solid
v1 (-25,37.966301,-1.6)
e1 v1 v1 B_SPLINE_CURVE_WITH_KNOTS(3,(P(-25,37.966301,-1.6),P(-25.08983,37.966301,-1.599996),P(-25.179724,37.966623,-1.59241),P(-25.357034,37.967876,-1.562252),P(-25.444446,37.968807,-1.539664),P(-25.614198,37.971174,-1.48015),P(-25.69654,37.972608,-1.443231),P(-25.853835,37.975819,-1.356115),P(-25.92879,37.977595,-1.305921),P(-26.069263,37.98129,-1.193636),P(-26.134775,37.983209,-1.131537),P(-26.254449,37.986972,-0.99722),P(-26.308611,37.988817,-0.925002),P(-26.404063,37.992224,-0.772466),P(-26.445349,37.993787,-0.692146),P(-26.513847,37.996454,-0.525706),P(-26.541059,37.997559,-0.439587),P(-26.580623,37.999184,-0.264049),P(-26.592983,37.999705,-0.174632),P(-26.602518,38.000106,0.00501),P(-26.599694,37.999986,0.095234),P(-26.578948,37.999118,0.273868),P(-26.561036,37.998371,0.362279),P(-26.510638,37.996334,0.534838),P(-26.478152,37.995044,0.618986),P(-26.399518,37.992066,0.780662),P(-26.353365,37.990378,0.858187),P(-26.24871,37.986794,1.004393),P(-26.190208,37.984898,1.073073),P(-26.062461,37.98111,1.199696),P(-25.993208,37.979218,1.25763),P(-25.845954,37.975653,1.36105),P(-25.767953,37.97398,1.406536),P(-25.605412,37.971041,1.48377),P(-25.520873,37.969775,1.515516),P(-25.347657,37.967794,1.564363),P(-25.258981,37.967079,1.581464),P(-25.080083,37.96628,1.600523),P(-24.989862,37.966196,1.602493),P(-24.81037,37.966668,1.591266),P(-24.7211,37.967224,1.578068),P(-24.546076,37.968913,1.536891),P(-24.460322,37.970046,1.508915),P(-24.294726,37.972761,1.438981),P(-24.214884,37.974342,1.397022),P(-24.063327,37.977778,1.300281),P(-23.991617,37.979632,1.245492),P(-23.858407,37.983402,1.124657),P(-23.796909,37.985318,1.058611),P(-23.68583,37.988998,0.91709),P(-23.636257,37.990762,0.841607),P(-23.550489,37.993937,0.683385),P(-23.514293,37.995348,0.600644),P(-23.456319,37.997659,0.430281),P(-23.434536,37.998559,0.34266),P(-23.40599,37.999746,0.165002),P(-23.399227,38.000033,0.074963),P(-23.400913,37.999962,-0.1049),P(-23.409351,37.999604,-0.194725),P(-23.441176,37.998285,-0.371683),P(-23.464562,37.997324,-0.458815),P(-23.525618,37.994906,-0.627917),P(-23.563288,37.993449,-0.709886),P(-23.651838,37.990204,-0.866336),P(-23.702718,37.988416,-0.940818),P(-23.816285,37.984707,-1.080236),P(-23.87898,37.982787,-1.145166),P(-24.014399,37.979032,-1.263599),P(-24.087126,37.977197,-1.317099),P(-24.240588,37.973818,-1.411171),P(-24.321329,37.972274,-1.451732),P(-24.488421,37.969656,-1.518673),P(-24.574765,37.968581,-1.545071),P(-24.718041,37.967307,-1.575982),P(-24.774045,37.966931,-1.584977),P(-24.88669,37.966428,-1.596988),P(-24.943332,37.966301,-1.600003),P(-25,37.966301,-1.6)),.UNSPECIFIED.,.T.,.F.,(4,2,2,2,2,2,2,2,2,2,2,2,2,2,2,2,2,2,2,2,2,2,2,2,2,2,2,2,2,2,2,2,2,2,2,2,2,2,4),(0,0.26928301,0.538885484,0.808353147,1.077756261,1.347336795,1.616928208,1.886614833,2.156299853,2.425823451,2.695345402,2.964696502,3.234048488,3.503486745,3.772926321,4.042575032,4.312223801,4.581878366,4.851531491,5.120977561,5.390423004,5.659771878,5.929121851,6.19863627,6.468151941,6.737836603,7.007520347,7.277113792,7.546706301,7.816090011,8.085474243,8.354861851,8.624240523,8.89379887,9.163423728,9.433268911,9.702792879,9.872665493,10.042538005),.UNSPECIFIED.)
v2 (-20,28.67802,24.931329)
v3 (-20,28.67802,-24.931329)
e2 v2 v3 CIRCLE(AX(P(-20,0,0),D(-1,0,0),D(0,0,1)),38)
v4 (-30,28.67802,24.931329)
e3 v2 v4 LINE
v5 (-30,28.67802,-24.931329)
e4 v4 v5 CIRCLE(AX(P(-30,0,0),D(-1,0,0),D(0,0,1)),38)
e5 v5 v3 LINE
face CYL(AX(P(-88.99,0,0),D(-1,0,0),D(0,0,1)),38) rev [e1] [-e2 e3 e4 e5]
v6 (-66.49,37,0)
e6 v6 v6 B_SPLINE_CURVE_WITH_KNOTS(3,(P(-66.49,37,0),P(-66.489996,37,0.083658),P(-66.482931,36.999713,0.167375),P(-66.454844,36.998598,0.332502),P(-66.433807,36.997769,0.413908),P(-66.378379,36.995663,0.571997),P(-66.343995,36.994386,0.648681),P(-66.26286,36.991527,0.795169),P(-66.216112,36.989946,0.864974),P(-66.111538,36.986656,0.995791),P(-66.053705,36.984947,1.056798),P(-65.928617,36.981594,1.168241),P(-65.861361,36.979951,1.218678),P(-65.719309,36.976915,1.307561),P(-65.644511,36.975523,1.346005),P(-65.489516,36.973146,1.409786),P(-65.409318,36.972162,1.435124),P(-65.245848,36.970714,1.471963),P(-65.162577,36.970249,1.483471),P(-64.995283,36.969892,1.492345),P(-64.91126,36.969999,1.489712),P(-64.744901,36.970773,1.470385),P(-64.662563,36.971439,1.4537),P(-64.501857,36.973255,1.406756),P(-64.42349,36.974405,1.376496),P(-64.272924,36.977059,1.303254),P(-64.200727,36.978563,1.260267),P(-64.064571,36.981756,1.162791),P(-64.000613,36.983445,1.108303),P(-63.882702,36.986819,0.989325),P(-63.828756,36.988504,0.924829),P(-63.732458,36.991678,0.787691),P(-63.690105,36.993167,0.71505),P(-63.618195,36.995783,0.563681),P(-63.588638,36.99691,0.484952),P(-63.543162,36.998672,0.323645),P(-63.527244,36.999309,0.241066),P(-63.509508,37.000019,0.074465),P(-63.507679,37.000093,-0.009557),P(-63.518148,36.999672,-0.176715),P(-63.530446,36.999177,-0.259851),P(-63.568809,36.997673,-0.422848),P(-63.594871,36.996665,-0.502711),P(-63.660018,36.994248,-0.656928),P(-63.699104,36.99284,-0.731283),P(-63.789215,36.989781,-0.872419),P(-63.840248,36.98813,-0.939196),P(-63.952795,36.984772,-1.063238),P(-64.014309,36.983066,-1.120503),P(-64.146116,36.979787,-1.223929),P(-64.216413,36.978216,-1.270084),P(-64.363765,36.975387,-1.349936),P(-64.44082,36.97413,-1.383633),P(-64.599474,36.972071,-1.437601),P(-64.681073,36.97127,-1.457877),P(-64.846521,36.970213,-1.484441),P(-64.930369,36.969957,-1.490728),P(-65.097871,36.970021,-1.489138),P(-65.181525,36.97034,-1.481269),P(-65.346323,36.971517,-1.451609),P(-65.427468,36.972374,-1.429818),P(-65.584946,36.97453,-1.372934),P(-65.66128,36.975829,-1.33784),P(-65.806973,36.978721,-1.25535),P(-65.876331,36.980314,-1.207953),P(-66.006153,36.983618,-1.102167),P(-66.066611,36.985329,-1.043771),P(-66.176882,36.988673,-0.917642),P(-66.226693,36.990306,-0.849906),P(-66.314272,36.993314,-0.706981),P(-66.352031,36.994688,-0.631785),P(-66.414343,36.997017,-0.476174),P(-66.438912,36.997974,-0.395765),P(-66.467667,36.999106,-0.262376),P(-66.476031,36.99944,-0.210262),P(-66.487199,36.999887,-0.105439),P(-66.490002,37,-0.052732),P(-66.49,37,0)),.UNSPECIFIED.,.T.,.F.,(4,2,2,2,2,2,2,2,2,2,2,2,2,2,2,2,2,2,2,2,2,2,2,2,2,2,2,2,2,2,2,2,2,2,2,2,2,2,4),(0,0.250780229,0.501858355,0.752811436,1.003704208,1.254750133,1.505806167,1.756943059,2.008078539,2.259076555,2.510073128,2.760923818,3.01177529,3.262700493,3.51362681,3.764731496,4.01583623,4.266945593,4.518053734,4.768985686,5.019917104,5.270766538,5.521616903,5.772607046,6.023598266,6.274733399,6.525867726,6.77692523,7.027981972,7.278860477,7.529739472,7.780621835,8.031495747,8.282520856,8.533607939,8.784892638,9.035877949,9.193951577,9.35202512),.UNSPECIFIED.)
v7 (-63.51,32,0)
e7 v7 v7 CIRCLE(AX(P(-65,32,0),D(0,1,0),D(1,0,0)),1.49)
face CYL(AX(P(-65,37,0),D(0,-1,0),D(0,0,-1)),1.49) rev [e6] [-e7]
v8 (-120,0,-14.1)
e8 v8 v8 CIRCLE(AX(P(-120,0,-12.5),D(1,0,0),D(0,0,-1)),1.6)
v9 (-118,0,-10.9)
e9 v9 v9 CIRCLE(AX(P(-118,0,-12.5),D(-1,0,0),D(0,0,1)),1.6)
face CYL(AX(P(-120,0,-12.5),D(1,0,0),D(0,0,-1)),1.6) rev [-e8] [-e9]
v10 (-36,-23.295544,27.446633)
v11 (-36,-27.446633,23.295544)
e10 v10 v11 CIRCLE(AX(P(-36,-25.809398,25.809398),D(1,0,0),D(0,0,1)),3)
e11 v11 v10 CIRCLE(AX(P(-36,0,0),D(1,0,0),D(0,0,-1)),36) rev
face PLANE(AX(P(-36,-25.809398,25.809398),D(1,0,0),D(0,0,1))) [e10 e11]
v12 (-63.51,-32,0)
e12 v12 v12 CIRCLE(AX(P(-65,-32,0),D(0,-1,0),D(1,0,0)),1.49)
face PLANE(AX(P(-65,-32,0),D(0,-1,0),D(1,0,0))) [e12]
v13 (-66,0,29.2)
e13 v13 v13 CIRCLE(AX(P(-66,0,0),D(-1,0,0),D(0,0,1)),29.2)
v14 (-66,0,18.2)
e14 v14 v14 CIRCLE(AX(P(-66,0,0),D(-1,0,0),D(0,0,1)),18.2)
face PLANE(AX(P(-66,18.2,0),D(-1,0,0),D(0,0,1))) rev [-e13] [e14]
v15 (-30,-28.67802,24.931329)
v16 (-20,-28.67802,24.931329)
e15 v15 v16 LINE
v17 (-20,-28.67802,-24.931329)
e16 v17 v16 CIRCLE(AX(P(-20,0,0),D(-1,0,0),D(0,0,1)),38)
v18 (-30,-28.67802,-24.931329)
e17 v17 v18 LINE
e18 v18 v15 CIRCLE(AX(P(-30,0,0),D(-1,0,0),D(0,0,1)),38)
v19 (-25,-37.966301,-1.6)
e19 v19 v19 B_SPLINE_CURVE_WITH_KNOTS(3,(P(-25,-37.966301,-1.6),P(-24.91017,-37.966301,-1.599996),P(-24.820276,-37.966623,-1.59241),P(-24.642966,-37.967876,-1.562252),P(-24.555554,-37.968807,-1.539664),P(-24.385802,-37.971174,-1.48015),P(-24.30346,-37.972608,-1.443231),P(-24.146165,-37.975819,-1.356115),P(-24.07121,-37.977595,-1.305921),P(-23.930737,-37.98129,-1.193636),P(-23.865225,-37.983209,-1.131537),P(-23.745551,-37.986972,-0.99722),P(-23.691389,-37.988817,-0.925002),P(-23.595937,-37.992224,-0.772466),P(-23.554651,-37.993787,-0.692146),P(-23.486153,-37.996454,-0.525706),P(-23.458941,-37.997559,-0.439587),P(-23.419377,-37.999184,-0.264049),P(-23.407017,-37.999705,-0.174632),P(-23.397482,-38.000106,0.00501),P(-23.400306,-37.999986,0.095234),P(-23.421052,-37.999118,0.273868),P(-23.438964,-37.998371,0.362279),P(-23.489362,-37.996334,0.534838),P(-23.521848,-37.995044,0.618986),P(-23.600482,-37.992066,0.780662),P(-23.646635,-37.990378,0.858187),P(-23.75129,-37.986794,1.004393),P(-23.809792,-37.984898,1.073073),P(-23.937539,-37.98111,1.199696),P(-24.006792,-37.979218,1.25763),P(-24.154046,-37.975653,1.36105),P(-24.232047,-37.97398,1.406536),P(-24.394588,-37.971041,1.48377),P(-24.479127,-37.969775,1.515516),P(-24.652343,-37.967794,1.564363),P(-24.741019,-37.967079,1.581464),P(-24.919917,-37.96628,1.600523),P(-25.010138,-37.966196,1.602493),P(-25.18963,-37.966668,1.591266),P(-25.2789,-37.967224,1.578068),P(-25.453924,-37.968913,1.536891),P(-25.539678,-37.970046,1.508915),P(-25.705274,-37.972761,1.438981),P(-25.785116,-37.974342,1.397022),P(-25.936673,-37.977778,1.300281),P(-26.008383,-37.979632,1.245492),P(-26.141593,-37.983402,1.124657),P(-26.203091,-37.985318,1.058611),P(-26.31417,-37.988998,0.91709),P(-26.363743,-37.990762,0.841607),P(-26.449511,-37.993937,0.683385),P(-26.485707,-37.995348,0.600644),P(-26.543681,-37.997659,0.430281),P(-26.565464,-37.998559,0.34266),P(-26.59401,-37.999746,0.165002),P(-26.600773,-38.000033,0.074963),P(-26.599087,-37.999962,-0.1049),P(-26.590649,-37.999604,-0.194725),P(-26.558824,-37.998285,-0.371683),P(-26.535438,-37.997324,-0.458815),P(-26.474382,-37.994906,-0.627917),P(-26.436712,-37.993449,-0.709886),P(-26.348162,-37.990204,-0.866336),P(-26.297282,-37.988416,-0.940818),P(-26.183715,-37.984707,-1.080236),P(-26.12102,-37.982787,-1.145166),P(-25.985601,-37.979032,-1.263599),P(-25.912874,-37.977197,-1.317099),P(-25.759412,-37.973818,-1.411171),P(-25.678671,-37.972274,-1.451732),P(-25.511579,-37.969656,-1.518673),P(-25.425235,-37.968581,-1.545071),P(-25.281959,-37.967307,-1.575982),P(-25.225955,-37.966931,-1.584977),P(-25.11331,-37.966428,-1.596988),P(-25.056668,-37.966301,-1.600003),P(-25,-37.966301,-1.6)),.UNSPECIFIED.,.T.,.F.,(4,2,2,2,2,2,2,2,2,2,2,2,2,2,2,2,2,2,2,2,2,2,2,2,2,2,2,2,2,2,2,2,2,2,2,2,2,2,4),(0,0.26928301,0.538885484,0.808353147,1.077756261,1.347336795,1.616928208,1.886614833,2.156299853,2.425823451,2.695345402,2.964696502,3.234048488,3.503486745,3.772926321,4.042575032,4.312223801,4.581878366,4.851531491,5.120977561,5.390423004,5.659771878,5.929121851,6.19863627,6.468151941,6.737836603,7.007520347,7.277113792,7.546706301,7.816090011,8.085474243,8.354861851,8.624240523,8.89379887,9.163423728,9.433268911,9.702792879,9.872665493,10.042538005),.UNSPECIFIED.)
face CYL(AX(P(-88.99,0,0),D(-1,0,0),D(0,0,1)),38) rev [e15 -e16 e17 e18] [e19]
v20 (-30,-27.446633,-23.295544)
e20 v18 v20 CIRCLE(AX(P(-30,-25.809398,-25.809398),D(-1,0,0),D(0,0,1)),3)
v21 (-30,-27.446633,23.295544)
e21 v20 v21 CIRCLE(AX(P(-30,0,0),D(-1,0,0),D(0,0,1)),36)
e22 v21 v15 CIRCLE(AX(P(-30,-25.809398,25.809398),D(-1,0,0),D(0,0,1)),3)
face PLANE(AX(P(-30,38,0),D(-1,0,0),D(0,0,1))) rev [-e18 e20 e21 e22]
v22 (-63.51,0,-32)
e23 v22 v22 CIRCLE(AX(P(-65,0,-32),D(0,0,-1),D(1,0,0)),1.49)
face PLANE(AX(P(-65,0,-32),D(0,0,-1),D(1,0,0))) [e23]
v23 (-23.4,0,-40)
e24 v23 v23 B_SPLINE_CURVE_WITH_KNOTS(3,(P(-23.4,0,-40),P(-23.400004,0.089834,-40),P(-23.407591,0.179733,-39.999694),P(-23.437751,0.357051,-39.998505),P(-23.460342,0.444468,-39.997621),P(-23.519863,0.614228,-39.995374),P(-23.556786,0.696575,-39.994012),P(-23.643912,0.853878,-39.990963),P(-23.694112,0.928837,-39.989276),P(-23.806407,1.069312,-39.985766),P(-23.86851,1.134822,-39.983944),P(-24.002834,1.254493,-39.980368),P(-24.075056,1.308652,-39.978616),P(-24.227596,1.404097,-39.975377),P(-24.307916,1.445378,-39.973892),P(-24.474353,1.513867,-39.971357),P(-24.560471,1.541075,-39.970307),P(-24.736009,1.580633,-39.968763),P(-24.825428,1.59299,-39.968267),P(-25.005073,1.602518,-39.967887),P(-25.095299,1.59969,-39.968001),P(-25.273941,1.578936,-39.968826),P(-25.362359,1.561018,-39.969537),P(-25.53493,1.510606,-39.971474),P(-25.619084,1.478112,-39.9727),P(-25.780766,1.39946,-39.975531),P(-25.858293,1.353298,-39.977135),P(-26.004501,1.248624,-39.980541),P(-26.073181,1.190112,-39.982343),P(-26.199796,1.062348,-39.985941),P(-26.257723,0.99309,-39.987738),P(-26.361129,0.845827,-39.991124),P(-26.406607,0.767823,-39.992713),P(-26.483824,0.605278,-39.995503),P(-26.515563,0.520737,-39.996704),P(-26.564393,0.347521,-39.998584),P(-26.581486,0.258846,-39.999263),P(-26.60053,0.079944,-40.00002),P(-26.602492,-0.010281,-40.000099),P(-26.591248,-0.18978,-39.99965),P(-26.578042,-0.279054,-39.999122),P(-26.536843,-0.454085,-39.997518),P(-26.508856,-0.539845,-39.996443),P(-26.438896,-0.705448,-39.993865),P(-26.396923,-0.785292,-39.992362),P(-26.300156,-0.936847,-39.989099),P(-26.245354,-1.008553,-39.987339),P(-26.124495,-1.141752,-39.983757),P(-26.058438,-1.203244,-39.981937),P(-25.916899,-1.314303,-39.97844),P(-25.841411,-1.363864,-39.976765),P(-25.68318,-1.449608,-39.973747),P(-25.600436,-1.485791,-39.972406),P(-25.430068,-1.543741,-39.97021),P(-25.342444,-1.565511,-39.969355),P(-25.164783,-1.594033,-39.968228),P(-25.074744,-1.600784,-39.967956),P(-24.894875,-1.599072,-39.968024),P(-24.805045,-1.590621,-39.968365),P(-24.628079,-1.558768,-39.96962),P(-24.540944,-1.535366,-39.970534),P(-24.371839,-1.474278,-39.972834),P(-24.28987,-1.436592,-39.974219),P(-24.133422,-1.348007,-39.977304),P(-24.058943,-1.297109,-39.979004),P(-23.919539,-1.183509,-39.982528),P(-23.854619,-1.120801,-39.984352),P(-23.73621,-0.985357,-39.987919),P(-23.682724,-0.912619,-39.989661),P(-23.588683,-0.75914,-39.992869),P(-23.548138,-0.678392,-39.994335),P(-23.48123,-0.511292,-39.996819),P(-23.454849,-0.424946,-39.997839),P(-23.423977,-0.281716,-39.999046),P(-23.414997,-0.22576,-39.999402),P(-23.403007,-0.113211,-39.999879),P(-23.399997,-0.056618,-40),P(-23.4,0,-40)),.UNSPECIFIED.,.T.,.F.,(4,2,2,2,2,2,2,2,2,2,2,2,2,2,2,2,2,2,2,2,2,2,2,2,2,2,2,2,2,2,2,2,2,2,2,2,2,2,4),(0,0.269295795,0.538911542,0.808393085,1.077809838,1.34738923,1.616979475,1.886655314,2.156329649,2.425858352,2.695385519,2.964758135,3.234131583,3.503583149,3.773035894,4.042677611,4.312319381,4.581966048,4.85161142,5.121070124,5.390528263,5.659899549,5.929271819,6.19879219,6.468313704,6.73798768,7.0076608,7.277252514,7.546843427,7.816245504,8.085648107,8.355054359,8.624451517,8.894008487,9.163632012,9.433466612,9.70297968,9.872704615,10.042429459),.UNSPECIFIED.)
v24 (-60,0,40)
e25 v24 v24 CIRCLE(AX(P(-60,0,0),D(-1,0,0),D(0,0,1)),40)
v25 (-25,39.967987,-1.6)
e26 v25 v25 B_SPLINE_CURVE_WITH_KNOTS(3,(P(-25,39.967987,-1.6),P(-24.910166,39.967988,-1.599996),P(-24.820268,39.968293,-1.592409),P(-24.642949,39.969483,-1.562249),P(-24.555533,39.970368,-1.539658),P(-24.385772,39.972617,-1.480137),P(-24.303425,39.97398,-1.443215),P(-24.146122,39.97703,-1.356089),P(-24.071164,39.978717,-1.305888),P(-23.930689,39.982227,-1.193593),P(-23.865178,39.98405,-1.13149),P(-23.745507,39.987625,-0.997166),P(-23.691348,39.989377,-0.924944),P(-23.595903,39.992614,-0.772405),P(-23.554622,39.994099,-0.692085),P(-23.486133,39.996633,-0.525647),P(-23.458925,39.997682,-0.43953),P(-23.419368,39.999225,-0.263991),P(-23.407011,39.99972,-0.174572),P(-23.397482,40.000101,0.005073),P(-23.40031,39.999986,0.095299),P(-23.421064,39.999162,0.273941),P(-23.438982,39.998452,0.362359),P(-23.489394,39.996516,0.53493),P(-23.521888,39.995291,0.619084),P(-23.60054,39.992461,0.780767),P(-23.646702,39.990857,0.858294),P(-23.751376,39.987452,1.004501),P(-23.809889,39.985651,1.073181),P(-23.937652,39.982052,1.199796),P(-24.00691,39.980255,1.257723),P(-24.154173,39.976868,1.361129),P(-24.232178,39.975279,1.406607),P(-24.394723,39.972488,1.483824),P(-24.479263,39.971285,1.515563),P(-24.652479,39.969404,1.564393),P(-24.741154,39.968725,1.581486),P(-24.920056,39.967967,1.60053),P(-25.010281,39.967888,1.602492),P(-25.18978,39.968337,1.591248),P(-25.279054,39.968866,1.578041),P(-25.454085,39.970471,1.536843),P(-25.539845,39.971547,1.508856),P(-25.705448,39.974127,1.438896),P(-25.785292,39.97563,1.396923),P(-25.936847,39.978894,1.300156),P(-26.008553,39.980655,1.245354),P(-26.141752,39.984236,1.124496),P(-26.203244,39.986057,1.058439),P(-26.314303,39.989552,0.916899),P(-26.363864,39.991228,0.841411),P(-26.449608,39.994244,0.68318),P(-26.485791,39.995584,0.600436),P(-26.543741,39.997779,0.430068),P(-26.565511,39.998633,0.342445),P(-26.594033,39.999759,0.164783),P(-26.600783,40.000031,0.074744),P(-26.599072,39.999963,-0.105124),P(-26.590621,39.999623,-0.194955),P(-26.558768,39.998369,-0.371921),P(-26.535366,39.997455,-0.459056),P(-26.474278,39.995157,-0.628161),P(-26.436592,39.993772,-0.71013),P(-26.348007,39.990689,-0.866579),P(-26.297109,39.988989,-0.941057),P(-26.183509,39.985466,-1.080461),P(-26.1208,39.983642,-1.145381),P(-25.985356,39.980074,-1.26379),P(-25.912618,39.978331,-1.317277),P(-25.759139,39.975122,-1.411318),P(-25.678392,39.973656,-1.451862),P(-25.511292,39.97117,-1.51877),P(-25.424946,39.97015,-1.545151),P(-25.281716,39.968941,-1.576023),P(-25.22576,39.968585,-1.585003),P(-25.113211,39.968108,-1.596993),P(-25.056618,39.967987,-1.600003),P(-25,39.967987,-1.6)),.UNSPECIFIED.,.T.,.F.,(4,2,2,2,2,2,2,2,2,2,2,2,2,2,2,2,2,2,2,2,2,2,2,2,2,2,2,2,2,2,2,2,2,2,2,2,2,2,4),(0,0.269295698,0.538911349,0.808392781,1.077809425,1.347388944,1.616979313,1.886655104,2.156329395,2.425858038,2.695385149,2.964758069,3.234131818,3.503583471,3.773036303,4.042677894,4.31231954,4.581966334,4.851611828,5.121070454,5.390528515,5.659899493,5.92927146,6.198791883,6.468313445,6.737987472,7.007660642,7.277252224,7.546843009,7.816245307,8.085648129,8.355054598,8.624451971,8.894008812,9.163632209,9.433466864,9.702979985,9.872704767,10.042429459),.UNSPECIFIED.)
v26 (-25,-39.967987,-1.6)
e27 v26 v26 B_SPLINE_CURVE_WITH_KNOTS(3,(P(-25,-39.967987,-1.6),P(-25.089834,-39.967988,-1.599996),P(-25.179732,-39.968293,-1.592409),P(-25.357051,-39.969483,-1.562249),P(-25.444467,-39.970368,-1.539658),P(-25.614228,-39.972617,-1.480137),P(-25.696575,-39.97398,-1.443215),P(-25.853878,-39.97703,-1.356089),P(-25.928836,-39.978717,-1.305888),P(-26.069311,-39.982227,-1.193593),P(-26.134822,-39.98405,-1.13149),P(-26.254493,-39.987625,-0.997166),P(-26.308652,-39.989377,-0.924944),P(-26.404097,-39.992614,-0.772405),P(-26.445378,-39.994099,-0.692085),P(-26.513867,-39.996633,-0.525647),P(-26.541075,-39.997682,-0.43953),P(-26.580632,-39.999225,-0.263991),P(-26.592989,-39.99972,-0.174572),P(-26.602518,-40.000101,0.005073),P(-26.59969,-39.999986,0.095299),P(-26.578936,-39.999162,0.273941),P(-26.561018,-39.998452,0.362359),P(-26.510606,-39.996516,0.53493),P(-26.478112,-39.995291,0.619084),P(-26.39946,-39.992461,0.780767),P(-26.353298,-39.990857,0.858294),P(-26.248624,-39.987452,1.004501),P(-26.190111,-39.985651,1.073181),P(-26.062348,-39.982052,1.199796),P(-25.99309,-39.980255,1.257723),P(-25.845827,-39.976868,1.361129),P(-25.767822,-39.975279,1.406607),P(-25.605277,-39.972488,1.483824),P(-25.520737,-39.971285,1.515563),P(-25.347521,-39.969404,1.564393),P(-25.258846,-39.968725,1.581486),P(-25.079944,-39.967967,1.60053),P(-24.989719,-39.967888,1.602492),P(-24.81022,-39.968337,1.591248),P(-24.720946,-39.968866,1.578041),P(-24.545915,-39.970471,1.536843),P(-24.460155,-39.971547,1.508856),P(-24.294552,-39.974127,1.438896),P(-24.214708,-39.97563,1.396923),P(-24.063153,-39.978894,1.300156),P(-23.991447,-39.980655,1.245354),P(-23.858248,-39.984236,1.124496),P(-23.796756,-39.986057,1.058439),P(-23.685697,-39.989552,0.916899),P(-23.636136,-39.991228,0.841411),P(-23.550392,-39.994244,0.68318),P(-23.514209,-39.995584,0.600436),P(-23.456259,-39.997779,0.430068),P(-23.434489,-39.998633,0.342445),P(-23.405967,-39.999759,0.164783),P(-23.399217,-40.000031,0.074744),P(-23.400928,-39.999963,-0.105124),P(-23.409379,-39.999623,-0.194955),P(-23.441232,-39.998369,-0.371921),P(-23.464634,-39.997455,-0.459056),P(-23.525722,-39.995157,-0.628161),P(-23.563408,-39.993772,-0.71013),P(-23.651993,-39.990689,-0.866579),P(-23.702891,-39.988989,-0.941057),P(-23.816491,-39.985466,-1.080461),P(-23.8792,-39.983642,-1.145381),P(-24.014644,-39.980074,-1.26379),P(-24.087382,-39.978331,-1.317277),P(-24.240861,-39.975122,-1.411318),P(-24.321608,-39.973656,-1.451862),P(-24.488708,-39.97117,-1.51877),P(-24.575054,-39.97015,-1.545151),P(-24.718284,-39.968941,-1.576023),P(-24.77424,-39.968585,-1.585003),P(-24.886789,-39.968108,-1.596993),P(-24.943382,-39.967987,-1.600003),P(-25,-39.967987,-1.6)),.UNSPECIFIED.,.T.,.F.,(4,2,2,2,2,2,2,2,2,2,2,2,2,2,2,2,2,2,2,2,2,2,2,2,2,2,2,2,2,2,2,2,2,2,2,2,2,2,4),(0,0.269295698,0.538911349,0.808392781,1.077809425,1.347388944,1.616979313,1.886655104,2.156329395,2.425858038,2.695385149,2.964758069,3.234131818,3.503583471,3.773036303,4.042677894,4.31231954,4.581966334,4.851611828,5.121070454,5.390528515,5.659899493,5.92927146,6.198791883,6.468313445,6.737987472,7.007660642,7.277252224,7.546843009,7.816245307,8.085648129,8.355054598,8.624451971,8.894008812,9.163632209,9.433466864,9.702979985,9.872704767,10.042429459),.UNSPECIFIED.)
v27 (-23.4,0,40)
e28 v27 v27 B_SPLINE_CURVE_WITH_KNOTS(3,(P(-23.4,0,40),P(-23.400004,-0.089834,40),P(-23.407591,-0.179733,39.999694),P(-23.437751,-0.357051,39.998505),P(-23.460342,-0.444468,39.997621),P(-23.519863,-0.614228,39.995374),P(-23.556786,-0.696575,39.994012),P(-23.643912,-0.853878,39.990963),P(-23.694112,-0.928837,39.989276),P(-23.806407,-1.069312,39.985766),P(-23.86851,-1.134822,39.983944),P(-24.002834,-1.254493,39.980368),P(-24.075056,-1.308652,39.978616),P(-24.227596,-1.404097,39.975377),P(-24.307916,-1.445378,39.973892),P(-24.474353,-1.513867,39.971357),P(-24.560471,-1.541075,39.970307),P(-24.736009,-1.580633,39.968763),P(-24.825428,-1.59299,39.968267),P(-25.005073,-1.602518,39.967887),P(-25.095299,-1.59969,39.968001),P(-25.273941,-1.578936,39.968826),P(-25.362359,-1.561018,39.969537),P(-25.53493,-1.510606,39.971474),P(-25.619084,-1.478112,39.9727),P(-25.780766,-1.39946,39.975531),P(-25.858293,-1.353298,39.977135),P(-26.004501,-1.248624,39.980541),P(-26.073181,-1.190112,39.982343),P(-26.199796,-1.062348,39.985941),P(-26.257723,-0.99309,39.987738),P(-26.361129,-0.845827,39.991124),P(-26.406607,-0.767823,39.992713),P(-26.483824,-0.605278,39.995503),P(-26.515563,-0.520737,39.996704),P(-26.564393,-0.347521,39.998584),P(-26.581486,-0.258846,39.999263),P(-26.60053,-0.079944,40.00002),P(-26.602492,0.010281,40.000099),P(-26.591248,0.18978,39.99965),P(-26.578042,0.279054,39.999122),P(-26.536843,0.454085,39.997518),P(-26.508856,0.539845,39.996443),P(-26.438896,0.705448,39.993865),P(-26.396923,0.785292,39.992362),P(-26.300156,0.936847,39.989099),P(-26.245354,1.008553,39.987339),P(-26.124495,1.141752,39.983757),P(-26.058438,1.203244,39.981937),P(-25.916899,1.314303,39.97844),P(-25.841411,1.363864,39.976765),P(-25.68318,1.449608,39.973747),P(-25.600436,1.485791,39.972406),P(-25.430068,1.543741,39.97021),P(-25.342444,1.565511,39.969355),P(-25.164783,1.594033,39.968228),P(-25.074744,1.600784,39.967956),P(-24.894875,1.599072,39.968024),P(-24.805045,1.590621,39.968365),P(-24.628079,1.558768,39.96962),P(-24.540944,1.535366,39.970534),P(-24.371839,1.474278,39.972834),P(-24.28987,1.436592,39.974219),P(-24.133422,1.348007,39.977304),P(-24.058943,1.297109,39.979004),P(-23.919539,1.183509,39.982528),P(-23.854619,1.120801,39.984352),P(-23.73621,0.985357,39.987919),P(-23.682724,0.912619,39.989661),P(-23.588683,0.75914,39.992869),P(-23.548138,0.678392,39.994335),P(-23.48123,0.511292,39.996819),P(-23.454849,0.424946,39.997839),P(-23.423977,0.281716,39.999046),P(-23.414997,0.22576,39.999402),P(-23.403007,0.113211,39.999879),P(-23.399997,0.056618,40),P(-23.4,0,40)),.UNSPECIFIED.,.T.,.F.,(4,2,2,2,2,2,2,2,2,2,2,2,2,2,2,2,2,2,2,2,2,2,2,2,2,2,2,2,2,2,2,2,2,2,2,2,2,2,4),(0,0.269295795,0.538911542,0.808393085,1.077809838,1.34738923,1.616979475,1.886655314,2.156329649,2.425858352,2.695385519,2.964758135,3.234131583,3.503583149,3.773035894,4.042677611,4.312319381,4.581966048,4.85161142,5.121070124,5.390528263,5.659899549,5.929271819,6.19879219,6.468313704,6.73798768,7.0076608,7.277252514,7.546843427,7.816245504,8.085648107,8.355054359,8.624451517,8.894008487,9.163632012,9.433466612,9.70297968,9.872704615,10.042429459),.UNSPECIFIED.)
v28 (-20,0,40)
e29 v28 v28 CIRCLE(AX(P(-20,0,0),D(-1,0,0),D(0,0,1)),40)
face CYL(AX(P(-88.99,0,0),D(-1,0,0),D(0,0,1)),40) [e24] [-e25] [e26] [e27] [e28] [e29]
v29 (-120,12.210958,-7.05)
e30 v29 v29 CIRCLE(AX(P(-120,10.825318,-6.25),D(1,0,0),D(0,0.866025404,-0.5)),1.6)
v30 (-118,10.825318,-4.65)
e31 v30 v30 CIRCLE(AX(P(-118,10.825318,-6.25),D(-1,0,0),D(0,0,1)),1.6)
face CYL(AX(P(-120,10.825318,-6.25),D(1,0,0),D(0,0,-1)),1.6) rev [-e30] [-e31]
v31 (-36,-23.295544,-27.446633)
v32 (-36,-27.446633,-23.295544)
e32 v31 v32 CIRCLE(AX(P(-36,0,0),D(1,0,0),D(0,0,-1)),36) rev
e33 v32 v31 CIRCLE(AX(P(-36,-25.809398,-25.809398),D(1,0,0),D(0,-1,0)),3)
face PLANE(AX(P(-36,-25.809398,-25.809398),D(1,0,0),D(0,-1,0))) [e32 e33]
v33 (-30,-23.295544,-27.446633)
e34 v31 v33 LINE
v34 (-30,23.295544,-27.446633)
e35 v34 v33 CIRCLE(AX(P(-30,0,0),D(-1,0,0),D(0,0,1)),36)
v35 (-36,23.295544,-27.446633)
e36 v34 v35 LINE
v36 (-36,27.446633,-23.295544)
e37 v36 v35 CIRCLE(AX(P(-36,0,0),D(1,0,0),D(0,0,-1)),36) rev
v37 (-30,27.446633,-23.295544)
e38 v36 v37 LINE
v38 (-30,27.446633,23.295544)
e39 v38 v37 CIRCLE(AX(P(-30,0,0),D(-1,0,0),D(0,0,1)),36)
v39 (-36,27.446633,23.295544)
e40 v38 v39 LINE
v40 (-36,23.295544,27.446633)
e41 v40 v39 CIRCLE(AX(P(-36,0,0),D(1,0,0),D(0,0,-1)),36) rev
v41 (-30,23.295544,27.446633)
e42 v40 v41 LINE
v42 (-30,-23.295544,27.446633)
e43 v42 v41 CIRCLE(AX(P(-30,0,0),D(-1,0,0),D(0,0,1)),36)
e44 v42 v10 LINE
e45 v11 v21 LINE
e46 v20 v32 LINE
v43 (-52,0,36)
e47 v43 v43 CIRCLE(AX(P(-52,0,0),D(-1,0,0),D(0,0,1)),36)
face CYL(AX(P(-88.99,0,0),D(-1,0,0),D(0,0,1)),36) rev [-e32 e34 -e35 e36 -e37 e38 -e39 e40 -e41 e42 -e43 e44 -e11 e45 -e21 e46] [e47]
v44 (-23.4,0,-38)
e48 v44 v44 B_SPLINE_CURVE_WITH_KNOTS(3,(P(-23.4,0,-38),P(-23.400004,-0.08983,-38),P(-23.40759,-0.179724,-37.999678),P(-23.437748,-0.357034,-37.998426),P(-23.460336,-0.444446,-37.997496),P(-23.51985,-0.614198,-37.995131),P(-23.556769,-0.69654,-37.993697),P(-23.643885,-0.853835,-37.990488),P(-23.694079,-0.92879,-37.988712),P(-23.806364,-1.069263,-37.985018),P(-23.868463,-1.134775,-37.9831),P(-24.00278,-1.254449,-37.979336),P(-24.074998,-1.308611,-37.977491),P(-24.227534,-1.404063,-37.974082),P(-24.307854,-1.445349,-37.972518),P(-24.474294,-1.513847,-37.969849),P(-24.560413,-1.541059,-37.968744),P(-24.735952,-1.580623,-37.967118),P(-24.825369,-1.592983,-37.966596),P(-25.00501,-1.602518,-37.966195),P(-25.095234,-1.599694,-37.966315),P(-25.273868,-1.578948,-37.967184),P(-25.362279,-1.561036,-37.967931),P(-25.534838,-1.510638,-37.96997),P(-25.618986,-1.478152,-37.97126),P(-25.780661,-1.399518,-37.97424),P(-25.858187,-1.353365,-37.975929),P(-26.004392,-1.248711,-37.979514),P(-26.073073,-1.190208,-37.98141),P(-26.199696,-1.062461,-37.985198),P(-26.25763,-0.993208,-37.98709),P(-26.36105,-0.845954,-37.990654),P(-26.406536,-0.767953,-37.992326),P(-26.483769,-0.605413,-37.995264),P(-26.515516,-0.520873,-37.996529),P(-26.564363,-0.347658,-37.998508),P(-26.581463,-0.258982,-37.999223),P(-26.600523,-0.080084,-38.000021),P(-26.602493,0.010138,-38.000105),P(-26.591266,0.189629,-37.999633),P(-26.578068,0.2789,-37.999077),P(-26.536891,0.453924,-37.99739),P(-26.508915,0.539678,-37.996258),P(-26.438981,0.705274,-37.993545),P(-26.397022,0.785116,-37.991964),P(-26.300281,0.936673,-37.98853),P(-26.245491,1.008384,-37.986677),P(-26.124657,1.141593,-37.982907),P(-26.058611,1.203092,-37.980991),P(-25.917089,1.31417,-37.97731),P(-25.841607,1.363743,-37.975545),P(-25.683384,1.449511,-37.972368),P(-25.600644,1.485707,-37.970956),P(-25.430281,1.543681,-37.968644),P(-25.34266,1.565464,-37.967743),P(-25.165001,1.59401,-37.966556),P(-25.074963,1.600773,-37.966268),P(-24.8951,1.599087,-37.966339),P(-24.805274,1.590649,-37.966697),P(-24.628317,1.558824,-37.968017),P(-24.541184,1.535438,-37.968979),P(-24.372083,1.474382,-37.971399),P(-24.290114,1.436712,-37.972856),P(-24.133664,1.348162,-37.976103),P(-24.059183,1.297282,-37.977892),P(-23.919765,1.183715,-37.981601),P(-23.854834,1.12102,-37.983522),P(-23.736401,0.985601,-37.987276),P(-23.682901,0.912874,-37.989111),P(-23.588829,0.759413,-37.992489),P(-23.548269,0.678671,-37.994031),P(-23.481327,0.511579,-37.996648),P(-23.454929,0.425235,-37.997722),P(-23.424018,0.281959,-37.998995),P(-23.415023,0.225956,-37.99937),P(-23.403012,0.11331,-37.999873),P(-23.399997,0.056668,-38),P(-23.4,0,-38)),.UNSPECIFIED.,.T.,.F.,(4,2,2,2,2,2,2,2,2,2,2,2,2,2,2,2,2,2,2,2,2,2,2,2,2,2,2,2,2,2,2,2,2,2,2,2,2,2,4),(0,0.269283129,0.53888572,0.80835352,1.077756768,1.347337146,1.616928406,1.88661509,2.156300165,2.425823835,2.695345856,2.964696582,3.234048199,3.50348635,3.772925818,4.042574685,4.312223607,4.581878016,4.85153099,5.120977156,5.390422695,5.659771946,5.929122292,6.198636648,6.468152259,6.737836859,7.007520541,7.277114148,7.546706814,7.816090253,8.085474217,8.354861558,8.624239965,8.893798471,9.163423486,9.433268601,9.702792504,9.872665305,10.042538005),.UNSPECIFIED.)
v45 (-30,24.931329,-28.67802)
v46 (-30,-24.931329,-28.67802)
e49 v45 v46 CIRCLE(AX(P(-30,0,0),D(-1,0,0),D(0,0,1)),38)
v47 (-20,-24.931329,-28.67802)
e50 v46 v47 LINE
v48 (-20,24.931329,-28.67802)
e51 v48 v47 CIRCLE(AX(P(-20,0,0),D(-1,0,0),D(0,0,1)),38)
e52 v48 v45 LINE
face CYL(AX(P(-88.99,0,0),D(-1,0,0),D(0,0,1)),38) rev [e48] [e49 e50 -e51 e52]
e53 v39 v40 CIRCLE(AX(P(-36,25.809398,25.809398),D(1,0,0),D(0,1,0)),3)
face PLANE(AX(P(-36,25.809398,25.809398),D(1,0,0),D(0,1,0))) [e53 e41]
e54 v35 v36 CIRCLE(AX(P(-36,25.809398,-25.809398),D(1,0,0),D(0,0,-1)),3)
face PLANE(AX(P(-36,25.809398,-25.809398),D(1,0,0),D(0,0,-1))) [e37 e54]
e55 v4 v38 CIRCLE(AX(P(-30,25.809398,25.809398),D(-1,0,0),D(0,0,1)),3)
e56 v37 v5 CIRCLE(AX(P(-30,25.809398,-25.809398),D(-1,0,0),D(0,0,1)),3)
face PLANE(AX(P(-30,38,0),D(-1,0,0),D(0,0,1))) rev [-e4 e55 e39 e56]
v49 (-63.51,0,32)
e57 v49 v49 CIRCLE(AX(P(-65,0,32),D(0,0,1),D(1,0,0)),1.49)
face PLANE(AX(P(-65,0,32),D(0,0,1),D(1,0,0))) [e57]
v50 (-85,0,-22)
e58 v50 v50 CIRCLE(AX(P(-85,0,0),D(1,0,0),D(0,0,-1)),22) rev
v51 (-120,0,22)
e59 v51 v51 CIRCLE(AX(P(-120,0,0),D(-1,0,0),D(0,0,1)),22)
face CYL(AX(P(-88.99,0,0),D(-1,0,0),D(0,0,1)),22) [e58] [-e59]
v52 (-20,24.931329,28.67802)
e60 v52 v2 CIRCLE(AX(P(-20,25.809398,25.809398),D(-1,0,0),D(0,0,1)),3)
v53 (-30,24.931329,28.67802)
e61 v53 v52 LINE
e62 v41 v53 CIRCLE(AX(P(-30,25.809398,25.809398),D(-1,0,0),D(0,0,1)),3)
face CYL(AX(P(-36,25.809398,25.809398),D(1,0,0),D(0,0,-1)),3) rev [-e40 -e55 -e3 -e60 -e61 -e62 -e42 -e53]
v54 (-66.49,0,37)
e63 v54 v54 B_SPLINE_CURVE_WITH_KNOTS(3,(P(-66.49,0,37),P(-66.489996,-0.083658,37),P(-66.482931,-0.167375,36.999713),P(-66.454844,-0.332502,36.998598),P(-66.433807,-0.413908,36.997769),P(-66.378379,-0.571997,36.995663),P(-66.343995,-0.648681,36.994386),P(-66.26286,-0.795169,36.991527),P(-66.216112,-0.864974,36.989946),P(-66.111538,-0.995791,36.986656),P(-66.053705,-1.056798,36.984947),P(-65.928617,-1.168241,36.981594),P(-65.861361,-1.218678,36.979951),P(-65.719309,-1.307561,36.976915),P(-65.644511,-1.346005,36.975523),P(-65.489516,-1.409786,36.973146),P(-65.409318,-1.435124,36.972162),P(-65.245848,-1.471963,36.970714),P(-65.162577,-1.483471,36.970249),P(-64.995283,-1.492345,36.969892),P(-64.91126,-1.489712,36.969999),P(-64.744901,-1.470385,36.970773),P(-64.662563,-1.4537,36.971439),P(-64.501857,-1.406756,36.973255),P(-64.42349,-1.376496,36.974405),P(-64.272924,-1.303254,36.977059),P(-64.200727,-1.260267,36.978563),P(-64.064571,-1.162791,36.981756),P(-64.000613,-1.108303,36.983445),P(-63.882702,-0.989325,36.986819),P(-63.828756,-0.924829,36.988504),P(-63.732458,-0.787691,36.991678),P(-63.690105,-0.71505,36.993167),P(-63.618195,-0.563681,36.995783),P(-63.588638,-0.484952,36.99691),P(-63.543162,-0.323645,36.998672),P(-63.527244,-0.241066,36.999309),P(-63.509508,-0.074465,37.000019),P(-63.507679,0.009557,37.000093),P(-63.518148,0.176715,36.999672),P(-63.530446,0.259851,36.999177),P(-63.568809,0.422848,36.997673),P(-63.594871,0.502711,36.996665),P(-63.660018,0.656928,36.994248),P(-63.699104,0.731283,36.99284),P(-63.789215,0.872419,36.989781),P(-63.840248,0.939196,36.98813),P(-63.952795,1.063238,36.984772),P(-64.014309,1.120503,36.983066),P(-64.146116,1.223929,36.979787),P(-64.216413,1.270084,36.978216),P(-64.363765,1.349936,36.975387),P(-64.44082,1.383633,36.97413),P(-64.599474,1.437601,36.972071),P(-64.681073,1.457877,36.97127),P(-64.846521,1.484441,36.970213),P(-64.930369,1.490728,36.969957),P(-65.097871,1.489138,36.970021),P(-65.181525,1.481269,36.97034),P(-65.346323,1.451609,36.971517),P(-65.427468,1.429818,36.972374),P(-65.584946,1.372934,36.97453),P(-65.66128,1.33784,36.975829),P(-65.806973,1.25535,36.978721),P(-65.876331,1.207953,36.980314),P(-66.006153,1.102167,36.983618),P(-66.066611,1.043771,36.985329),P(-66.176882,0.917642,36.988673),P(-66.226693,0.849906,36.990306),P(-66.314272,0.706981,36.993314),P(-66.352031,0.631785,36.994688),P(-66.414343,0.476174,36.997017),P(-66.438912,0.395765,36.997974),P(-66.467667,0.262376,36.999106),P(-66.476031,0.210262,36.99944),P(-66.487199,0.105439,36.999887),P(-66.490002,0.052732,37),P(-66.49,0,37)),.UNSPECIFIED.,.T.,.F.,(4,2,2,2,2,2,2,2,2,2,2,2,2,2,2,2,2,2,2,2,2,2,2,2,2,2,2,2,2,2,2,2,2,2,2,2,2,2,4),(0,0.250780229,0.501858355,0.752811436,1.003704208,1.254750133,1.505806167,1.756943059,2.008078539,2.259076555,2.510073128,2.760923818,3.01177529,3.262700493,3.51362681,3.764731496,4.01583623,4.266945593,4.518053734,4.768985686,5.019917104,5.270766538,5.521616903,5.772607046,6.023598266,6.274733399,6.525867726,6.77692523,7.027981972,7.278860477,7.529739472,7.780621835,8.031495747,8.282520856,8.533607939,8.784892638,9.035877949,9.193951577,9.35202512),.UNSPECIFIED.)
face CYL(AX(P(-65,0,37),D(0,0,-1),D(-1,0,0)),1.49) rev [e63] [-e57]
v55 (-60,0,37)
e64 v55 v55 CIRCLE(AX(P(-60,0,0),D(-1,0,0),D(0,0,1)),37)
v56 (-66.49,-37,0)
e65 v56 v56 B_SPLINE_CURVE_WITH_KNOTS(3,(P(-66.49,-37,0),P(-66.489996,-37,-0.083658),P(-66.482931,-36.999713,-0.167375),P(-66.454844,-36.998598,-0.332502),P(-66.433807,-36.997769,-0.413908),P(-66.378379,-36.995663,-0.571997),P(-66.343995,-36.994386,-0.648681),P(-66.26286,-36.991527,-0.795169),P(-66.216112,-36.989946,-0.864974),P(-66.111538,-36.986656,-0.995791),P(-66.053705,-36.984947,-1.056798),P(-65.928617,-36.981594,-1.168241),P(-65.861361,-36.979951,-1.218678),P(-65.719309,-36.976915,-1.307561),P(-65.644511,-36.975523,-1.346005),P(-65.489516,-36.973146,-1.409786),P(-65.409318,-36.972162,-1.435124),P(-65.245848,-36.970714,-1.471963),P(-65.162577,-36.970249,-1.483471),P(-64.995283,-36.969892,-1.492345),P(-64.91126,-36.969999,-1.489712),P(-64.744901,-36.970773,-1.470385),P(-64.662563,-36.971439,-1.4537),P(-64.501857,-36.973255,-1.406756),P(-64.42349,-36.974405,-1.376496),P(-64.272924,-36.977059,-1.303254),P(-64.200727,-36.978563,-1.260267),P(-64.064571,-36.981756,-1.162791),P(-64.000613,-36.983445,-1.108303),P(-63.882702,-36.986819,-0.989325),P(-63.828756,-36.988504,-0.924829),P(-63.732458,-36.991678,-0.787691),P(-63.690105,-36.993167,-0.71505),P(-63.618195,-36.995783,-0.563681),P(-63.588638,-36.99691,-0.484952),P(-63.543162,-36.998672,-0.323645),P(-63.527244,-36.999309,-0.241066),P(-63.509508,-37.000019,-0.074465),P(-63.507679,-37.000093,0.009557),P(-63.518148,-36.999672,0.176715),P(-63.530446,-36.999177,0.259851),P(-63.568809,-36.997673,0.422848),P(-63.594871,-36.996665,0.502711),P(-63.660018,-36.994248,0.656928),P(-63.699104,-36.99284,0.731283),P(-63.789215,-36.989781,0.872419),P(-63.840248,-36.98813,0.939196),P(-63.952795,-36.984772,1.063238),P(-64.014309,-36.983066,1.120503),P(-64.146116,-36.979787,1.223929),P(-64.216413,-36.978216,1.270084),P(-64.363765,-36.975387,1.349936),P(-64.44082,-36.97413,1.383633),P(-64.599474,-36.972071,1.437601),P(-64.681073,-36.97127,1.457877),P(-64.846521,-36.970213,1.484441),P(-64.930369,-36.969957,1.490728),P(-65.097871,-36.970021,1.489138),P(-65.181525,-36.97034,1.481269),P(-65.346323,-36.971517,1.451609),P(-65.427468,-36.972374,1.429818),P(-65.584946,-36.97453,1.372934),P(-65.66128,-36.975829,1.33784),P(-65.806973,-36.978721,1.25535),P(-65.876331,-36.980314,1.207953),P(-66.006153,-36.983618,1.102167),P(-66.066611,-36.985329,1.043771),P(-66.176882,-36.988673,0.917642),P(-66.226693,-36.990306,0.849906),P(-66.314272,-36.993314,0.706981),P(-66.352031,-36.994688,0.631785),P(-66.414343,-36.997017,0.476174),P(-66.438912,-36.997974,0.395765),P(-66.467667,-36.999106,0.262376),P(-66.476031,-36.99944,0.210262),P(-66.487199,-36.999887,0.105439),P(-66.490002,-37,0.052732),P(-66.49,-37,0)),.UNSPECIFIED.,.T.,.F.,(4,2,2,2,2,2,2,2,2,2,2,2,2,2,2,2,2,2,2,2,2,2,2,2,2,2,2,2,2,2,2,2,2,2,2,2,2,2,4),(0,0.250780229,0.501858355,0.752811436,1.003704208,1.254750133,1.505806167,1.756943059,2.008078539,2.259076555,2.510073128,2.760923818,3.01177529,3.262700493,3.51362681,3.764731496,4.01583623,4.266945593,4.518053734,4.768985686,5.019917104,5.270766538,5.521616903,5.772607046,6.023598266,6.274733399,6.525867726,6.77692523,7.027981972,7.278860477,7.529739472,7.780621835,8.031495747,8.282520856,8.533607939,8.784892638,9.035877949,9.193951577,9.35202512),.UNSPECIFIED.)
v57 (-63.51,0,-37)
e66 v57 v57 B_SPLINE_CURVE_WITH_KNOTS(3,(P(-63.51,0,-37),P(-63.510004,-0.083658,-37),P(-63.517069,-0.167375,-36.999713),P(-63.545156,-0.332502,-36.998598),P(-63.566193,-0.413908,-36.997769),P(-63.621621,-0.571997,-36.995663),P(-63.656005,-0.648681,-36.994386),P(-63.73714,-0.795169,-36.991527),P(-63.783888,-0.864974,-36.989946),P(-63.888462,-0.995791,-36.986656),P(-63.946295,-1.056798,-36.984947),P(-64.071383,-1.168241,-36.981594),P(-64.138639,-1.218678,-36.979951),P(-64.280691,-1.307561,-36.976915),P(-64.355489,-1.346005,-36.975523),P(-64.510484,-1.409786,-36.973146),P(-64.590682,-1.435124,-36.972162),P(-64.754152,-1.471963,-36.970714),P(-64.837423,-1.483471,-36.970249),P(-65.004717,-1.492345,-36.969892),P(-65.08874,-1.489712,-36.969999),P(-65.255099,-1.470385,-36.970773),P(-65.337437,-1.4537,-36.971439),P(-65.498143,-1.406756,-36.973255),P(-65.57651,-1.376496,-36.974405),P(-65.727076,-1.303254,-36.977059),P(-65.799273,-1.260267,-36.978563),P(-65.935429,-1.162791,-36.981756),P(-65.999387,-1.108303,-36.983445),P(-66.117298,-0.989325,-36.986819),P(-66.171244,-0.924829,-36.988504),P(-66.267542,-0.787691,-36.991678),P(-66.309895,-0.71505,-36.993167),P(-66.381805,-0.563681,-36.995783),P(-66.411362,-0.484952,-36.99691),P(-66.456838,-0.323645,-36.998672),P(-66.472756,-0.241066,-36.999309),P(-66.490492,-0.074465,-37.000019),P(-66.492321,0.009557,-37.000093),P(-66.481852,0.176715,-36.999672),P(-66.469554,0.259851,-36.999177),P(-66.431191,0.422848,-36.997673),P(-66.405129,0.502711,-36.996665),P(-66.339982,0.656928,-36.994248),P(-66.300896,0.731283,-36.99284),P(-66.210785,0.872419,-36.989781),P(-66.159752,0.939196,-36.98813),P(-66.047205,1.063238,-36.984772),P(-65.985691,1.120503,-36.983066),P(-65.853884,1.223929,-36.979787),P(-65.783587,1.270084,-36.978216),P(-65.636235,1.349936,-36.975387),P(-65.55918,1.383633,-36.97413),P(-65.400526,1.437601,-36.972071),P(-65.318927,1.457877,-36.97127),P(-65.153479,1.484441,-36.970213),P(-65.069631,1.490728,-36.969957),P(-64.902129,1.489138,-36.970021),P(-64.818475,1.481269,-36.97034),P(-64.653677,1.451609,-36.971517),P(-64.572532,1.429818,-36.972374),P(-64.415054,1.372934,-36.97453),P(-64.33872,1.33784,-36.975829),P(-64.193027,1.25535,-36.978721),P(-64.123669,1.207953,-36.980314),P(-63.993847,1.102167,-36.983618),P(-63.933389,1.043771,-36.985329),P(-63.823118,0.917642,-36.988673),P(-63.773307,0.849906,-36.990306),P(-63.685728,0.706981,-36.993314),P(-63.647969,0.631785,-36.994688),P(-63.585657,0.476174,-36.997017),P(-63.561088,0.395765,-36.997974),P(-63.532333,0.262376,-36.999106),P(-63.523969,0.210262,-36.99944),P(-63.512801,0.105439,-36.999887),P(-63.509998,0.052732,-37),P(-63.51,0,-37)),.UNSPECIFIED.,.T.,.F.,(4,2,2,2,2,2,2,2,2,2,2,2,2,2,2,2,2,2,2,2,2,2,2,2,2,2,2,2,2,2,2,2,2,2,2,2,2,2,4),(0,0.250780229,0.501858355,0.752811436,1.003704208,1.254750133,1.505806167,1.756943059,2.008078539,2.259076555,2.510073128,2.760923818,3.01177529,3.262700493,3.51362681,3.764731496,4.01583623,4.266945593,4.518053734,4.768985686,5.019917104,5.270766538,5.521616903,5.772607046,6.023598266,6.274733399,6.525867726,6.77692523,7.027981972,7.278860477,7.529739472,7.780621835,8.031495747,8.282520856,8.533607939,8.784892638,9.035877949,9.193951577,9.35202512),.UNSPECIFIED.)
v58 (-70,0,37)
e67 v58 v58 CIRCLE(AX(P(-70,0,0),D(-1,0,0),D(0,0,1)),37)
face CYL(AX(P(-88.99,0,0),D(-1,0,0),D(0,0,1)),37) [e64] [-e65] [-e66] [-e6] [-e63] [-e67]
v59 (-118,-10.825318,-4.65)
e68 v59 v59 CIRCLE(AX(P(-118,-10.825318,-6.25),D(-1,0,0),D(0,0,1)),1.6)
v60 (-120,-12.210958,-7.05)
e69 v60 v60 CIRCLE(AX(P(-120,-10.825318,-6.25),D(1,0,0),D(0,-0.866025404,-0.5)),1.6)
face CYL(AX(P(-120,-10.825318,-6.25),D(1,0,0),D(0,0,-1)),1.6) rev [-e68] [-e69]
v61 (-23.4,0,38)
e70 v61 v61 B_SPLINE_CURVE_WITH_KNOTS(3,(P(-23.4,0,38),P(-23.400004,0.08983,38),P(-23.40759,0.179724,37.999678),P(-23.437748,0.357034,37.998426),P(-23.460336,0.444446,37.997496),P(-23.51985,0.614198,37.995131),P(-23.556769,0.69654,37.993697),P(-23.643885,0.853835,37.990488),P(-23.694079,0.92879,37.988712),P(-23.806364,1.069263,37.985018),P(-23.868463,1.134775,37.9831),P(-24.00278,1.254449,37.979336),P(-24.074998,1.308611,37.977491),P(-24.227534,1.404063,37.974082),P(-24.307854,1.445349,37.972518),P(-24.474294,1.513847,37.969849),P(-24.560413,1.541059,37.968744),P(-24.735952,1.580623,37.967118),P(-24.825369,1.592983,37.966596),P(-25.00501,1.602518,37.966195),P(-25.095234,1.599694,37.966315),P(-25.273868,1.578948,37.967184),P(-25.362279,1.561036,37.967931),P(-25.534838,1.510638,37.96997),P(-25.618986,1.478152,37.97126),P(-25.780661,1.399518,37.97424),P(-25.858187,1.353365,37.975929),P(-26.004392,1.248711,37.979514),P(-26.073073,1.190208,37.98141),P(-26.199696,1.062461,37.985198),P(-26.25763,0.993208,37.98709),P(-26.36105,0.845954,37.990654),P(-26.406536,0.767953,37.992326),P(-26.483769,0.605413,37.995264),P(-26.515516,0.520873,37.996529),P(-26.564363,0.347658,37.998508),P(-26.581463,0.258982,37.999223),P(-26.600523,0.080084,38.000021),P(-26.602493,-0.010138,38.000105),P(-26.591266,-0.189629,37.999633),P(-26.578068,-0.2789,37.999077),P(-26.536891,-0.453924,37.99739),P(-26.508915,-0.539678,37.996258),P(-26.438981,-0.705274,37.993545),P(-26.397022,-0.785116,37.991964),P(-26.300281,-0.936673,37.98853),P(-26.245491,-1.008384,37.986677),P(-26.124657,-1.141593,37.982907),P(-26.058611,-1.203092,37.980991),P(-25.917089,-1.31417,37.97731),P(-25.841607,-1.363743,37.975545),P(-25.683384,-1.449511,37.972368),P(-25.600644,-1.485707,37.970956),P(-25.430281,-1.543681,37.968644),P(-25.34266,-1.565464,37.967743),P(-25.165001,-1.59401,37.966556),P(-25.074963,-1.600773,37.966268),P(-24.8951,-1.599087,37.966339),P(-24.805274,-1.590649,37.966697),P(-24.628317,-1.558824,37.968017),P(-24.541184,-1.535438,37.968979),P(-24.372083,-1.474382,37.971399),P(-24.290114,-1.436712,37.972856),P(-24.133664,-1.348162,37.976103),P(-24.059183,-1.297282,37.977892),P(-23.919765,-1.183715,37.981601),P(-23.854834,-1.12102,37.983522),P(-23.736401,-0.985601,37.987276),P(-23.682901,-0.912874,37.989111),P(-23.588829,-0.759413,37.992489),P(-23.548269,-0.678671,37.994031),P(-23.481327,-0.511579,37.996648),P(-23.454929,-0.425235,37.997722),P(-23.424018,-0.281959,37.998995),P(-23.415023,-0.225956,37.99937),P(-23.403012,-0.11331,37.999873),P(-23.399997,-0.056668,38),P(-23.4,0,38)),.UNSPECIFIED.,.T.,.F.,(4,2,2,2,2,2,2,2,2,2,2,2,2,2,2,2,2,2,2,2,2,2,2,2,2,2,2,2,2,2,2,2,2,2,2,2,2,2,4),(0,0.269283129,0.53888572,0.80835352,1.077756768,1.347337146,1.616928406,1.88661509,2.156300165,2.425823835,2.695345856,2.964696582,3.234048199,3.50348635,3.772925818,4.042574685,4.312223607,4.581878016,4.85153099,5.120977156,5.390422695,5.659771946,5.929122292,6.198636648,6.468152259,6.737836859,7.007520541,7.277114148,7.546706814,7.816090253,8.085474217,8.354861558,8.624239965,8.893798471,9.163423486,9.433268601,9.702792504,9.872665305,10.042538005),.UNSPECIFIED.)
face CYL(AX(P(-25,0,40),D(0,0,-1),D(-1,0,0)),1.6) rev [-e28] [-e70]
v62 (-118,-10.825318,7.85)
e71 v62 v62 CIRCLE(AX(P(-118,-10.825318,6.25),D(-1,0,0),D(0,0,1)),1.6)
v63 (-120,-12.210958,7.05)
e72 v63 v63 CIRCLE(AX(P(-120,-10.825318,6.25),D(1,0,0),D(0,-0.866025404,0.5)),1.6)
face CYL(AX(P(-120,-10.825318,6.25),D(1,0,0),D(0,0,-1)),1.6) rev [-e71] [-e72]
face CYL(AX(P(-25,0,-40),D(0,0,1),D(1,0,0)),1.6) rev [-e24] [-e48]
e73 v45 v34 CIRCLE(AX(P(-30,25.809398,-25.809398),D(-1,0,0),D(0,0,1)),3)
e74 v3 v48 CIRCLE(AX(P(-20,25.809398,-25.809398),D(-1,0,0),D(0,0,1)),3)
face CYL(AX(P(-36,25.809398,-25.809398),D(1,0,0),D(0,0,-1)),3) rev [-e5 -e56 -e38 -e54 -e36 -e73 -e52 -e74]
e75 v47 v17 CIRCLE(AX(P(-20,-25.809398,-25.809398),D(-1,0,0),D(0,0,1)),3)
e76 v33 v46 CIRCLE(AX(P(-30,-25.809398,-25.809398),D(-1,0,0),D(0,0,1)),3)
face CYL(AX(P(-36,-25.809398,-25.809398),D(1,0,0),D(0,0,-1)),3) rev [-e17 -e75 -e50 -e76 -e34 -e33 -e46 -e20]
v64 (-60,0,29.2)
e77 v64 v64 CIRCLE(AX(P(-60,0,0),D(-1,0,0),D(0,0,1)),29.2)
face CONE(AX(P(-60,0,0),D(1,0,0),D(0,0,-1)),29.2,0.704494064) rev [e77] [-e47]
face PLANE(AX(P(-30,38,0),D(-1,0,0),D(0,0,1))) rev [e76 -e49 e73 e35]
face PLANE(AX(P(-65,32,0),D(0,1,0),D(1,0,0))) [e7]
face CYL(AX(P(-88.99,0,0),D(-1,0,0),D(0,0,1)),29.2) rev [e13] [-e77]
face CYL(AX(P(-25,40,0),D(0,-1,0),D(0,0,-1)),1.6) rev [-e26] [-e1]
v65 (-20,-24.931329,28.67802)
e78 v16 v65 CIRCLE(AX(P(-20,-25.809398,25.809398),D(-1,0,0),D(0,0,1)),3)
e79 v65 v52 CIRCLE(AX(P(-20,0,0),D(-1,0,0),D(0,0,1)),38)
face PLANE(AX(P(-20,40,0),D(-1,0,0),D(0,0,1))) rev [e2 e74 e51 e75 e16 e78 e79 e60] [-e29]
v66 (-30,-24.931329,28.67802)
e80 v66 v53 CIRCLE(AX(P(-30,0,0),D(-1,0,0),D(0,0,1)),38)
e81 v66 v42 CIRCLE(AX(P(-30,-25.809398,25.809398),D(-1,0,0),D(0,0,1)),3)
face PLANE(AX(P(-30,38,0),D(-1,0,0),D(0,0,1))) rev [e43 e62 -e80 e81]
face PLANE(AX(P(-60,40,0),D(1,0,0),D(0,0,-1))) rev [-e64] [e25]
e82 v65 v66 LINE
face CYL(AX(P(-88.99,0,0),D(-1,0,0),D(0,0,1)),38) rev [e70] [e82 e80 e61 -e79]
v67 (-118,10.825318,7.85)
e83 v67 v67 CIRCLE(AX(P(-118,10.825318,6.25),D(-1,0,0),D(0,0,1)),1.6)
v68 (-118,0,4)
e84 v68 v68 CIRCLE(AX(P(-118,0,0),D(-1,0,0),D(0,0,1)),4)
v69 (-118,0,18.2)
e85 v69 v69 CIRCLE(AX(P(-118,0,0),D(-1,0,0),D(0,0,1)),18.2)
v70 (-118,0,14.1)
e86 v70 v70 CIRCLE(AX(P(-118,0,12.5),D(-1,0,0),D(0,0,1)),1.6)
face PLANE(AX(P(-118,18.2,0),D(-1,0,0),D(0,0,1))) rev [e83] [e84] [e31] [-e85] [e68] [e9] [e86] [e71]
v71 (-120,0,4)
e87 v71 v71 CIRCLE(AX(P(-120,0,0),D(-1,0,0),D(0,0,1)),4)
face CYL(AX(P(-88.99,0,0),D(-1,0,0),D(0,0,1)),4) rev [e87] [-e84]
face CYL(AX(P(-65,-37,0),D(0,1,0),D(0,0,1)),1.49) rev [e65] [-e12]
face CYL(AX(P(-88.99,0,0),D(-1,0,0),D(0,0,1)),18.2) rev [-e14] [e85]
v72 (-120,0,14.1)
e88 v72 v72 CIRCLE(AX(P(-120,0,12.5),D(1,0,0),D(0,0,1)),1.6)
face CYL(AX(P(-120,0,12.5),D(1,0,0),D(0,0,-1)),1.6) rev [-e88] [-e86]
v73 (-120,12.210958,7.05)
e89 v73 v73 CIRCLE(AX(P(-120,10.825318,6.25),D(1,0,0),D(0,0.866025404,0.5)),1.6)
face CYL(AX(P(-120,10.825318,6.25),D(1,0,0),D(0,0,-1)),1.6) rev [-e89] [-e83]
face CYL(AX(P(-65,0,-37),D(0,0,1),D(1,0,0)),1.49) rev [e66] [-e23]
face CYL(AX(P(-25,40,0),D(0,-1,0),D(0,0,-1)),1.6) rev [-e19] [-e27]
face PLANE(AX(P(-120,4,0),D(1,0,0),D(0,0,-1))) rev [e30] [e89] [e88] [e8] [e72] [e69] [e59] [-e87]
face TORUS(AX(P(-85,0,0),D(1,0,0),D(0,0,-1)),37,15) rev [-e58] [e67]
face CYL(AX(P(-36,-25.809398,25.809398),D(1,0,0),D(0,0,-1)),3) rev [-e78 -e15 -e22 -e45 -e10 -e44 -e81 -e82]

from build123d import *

# Parameters (mm, degrees)
IZIM12_R                = 1.6
KES_EKSTR_ZYON1_DEPTH   = 133.664991614
DAIRESEL_KAPLAMA1_COUNT = 6
KES_EKSTR_ZYON2_START   = 32
IZIM13_R                = 1.49
KES_EKSTR_ZYON2_DEPTH   = 5
DAIRESEL_KAPLAMA2_COUNT = 4
IZIM14_R                = 1.6
KES_EKSTR_ZYON3_DEPTH   = 133.664991614
DAIRESEL_KAPLAMA3_COUNT = 4
IZIM15_R                = 3
KES_EKSTR_ZYON5_DEPTH   = 36
DAIRESEL_KAPLAMA4_COUNT = 4
RADYUS1_R               = 15


with BuildPart() as part:
    # Çizim1 → Döndür1 (revolve)
    with BuildSketch(Plane.XY, mode=Mode.PRIVATE) as d_nd_r1_sk:
        Polygon((-60, 40), (-60, 37), (-70, 37), (-70, 22), (-120, 22), (-120, 4), (-118, 4), (-118, 18.2), (-66, 18.2), (-66, 29.2), (-60, 29.2), (-52, 36), (-30, 36), (-30, 38), (-20, 38), (-20, 40), align=None)
    revolve(d_nd_r1_sk.sketch.rotate(Axis((-88.99, 0, 0), (1, 0, 0)), 90), axis=Axis((-88.99, 0, 0), (1, 0, 0)))

    # Çizim12 → Kes-Ekstrüzyon1 (cut, through all)
    with BuildSketch(Plane(origin=(0, 0, 0), x_dir=(0, 0, -1), z_dir=(1, 0, 0))):
        with Locations((12.5, 0)):
            Circle(IZIM12_R)
    kes_ekstr_zyon1 = extrude(amount=-KES_EKSTR_ZYON1_DEPTH, mode=Mode.SUBTRACT)

    # Dairesel Kaplama1: Kes-Ekstrüzyon1 ×6 about axis
    dairesel_kaplama1_axis = Axis((0, 0, 0), (1, 0, 0))
    for i in range(1, DAIRESEL_KAPLAMA1_COUNT):
        add(kes_ekstr_zyon1.rotate(dairesel_kaplama1_axis, i * 360 / DAIRESEL_KAPLAMA1_COUNT), mode=Mode.SUBTRACT)

    # Çizim13 → Kes-Ekstrüzyon2 (cut)
    with BuildSketch(Plane.XY.offset(KES_EKSTR_ZYON2_START)):
        with Locations((-65, 0)):
            Circle(IZIM13_R)
    kes_ekstr_zyon2 = extrude(amount=KES_EKSTR_ZYON2_DEPTH, mode=Mode.SUBTRACT)

    # Dairesel Kaplama2: Kes-Ekstrüzyon2 ×4 about axis
    dairesel_kaplama2_axis = Axis((0, 0, 0), (1, 0, 0))
    for i in range(1, DAIRESEL_KAPLAMA2_COUNT):
        add(kes_ekstr_zyon2.rotate(dairesel_kaplama2_axis, i * 360 / DAIRESEL_KAPLAMA2_COUNT), mode=Mode.SUBTRACT)

    # Çizim14 → Kes-Ekstrüzyon3 (cut, through all)
    with BuildSketch(Plane.XY):
        with Locations((-25, 0)):
            Circle(IZIM14_R)
    kes_ekstr_zyon3 = extrude(amount=-KES_EKSTR_ZYON3_DEPTH, mode=Mode.SUBTRACT)

    # Dairesel Kaplama3: Kes-Ekstrüzyon3 ×4 about axis
    dairesel_kaplama3_axis = Axis((-88.99, 0, 0), (1, 0, 0))
    for i in range(1, DAIRESEL_KAPLAMA3_COUNT):
        add(kes_ekstr_zyon3.rotate(dairesel_kaplama3_axis, i * 360 / DAIRESEL_KAPLAMA3_COUNT), mode=Mode.SUBTRACT)

    # Çizim15 → Kes-Ekstrüzyon5 (cut)
    with BuildSketch(Plane(origin=(0, 0, 0), x_dir=(0, 0, -1), z_dir=(1, 0, 0))):
        with Locations((25.809397513, 25.809397513)):
            Circle(IZIM15_R)
    kes_ekstr_zyon5 = extrude(amount=-KES_EKSTR_ZYON5_DEPTH, mode=Mode.SUBTRACT)

    # Dairesel Kaplama4: Kes-Ekstrüzyon5 ×4 about axis
    dairesel_kaplama4_axis = Axis((0, 0, 0), (1, 0, 0))
    for i in range(1, DAIRESEL_KAPLAMA4_COUNT):
        add(kes_ekstr_zyon5.rotate(dairesel_kaplama4_axis, i * 360 / DAIRESEL_KAPLAMA4_COUNT), mode=Mode.SUBTRACT)

    # Radyus1
    radyus1_edges = [part.edges().sort_by_distance(p)[0] for p in [
        (-70, 0, -22),
    ]]
    fillet(radyus1_edges, radius=RADYUS1_R - 0.0001)  # a hair under: the kernel refuses the full size


solid = part.part
